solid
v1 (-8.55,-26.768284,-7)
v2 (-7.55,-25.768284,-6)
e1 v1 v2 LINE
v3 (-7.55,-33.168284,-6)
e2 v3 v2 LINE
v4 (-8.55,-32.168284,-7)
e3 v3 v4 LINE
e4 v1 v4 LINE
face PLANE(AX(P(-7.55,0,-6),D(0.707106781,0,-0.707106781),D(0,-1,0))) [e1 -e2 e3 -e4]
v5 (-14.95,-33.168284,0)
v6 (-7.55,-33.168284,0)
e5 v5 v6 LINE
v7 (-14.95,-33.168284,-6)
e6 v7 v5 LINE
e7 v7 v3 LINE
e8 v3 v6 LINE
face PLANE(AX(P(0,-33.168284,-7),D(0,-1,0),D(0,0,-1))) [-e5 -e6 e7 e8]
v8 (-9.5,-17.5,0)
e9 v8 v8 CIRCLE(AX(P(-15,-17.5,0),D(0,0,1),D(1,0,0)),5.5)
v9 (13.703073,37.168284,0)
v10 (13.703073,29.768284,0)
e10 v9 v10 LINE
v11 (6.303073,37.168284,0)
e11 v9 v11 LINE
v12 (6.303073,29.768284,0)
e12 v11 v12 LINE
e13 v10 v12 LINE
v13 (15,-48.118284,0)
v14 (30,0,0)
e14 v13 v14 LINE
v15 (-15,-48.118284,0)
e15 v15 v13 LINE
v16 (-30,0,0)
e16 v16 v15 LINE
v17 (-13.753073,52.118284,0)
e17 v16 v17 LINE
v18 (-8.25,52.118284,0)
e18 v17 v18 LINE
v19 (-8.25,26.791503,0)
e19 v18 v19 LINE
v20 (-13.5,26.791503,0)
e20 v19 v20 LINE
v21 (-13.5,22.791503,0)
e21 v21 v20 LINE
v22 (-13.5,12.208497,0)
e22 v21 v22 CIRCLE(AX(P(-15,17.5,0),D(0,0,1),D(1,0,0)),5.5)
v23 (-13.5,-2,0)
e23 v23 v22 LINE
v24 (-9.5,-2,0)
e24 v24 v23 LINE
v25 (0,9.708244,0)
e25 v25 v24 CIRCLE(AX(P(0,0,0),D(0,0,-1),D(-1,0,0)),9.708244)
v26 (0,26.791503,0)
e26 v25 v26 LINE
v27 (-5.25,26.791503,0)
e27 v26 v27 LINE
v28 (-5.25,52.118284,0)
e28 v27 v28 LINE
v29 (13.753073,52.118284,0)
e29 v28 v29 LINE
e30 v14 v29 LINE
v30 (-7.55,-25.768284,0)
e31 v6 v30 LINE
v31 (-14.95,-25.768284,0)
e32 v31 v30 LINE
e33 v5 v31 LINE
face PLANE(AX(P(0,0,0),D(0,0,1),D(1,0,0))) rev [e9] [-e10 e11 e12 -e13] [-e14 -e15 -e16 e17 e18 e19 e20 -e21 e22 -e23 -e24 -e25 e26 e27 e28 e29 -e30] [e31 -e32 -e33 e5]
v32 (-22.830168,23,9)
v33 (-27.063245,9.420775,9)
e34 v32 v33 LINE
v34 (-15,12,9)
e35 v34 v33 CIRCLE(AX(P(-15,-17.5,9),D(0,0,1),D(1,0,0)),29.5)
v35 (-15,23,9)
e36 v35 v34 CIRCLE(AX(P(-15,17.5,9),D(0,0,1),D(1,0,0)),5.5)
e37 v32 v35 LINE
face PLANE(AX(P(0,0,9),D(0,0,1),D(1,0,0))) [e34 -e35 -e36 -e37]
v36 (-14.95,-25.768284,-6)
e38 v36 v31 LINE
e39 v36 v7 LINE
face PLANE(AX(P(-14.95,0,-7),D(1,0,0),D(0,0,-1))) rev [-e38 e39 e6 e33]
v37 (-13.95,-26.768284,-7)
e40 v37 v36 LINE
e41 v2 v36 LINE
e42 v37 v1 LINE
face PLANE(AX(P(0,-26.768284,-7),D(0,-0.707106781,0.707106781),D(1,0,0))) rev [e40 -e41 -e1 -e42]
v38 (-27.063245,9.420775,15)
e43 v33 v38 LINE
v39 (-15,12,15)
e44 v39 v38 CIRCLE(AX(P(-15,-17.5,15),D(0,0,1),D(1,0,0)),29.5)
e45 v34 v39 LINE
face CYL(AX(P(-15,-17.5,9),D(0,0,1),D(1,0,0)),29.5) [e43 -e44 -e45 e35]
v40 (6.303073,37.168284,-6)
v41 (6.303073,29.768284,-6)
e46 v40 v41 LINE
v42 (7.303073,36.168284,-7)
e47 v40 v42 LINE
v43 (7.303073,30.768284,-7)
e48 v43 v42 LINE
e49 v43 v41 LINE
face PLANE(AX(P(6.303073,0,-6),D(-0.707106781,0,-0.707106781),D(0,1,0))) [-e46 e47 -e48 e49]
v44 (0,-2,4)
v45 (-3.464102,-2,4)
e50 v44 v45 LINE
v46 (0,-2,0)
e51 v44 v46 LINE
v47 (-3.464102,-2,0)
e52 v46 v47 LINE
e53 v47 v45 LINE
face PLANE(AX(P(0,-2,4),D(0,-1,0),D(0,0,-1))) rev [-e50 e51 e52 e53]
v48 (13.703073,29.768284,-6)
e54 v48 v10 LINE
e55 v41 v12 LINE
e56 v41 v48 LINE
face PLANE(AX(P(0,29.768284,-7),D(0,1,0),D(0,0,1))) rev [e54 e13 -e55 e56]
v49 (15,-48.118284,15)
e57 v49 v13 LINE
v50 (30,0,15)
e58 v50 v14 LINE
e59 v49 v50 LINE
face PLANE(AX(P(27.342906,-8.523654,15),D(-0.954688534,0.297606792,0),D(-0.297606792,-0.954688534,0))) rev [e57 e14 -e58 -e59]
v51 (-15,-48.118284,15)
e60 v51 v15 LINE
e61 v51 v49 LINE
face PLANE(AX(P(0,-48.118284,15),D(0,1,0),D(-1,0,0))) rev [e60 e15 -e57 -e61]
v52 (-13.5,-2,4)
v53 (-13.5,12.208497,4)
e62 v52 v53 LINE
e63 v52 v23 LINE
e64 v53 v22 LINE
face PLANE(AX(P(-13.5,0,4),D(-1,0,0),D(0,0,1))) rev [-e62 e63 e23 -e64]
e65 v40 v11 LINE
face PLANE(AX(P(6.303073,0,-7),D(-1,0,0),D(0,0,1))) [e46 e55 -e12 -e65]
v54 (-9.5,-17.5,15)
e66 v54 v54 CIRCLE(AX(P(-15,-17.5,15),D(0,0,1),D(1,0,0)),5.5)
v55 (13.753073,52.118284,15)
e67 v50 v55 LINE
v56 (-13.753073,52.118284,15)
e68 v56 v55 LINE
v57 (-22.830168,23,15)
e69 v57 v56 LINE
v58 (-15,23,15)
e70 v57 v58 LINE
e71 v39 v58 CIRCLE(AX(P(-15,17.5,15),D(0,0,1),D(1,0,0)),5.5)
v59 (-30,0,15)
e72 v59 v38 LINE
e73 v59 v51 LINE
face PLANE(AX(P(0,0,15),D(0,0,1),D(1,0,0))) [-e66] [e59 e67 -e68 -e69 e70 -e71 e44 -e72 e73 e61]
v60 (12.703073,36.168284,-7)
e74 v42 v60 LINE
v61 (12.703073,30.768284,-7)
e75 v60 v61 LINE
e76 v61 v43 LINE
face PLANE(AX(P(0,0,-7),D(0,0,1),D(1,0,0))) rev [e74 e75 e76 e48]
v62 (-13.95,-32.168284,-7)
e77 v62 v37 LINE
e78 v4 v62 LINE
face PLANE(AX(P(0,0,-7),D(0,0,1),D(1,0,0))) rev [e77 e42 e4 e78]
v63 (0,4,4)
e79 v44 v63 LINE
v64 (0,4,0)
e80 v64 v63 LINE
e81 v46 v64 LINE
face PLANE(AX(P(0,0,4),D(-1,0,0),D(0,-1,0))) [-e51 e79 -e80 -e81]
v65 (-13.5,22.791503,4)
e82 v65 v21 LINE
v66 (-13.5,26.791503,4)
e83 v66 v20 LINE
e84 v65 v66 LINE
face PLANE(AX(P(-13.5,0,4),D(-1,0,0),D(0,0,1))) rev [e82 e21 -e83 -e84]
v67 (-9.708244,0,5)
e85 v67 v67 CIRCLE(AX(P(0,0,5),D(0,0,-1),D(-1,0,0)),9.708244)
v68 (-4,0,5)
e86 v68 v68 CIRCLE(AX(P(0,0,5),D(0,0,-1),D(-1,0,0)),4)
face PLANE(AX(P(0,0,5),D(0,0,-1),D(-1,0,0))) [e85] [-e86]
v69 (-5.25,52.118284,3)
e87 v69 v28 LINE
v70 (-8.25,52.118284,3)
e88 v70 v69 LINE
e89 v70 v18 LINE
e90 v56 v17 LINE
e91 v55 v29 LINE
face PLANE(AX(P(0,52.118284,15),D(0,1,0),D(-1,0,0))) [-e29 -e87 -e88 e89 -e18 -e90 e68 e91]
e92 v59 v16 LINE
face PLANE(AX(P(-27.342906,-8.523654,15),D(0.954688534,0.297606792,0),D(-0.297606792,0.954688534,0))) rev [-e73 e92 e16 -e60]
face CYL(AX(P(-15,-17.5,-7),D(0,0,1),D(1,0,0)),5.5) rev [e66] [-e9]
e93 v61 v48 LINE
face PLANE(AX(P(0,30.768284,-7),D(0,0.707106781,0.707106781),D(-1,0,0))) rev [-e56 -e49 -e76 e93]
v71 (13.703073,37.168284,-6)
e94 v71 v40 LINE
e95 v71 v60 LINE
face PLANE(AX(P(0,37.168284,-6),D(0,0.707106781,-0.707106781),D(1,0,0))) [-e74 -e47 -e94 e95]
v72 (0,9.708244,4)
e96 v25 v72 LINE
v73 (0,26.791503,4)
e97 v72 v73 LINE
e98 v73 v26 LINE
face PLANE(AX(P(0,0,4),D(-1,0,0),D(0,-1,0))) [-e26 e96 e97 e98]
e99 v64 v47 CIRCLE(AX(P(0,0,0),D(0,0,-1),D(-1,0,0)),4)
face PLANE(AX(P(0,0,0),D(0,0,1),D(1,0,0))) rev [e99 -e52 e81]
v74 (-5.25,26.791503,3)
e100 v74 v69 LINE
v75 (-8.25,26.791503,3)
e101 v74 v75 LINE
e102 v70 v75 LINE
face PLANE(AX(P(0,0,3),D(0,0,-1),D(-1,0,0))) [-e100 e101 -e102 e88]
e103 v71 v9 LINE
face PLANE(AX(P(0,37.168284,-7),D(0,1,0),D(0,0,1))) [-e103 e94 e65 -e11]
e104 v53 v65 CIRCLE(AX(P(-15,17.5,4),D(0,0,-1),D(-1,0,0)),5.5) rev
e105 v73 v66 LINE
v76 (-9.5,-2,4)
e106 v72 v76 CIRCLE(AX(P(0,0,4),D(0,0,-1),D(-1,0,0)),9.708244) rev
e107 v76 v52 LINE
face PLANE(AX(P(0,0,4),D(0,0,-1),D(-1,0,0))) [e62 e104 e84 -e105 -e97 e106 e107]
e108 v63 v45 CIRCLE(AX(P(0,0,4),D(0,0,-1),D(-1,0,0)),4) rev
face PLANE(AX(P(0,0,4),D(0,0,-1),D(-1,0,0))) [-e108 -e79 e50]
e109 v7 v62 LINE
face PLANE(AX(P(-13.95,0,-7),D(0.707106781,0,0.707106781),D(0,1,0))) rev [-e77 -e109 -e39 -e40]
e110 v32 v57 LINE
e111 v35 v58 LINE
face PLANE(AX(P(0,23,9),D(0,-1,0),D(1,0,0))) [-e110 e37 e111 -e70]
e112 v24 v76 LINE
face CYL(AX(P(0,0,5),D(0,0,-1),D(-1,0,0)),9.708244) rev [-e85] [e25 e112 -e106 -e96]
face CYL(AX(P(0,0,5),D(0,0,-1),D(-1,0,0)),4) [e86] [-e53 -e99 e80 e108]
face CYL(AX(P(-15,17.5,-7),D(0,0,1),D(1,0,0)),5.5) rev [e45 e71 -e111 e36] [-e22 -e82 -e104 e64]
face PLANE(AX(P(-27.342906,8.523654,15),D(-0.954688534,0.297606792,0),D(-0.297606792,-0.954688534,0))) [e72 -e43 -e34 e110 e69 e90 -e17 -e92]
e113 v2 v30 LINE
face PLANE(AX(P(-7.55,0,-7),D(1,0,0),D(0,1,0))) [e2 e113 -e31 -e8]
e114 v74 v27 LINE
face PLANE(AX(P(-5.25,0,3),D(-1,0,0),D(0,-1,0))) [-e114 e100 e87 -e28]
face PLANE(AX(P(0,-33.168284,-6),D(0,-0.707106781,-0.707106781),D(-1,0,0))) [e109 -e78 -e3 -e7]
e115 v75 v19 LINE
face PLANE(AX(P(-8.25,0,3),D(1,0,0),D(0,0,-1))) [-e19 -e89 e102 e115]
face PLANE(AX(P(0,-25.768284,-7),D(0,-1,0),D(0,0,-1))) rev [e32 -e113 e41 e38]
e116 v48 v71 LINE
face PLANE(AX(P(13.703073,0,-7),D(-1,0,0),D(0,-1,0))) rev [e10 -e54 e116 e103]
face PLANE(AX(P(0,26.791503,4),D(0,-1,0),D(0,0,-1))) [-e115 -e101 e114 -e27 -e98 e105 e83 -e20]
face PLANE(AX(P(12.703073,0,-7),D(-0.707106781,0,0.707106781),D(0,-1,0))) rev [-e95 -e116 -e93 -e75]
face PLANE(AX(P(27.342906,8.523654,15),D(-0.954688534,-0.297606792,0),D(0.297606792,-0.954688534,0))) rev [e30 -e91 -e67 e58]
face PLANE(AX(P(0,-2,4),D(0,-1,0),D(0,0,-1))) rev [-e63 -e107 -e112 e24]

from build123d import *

# Parameters (mm, degrees)
BOSS_EXTRUDE1_DEPTH    = 15
SKETCH1_5_W            = 7.4
SKETCH1_5_H            = 7.4
BOSS_EXTRUDE2_DEPTH    = 7
CHAMFER1_SIZE          = 1
SKETCH2_R              = 9.708243919
SKETCH2_R_2            = 4
INNER_DISK_DEPTH       = 5
HOLE_DEPTH             = 65.033705881
HOLE_DEPTH_BACK        = 65.033705881
CUT_EXTRUDE5_DEPTH     = 6
CUT_EXTRUDE3_DEPTH     = 4
CUT_EXTRUDE4_START     = -8.25
CUT_EXTRUDE4_OUTLINE_W = 25.326781011
CUT_EXTRUDE4_OUTLINE_H = 3
CUT_EXTRUDE4_DEPTH     = 3


# Read off the part's stored shape, not the designer's step: Cut-Extrude4
with BuildPart() as part:
    # Sketch1 → Boss-Extrude1 (new body)
    with BuildSketch(Plane.XY):
        Polygon((30, 0), (13.753072731, 52.118283633), (-13.753072731, 52.118283633), (-30, 0), (-15, -48.118283633), (15, -48.118283633), align=None)
    extrude(amount=BOSS_EXTRUDE1_DEPTH)

    # Sketch1<5> → Boss-Extrude2 (add)
    with BuildSketch(Plane.XY):
        with Locations((10.003072731, 33.468283633)):
            Rectangle(SKETCH1_5_W, SKETCH1_5_H)
        with Locations((-11.25, -29.468283633)):
            Rectangle(SKETCH1_5_W, SKETCH1_5_H)
    extrude(amount=-BOSS_EXTRUDE2_DEPTH)

    # Chamfer1
    chamfer1_edges = [part.edges().sort_by_distance(p)[0] for p in [
        (10.003072731, 37.168283633, -7),
        (6.303072731, 33.468283633, -7),
        (13.703072731, 33.468283633, -7),
        (10.003072731, 29.768283633, -7),
        (-11.25, -33.168283633, -7),
        (-7.55, -29.468283633, -7),
        (-14.95, -29.468283633, -7),
        (-11.25, -25.768283633, -7),
    ]]
    chamfer(chamfer1_edges, length=CHAMFER1_SIZE)

    # Sketch2 → Inner Disk (cut)
    with BuildSketch(Plane(origin=(0, 0, 0), x_dir=(-1, 0, 0), z_dir=(0, 0, -1))):
        Circle(SKETCH2_R)
        Circle(SKETCH2_R_2, mode=Mode.SUBTRACT)
    extrude(amount=-INNER_DISK_DEPTH, mode=Mode.SUBTRACT)

    # Sketch3 → Hole (cut, two sides: drawn at the far end of the back side and taken through both)
    with BuildSketch(Plane.XY.offset(15).offset(-HOLE_DEPTH_BACK)):
        with BuildLine():
            ThreePointArc((-15, 23), (-20.5, 17.5), (-15, 12))
            Line((-15, 12), (-15, 17.5))
            Line((-15, 17.5), (-15, 23))
        make_face()
        with BuildLine():
            Line((-15, 17.5), (-15, 12))
            ThreePointArc((-15, 12), (-11.110912703, 13.610912703), (-9.5, 17.5))
            ThreePointArc((-9.5, 17.5), (-11.110912703, 21.389087297), (-15, 23))
            Line((-15, 23), (-15, 17.5))
        make_face()
        with BuildLine():
            ThreePointArc((-9.5, -17.5), (-11.110912703, -13.610912703), (-15, -12))
            Line((-15, -12), (-15, -17.5))
            Line((-15, -17.5), (-15, -23))
            ThreePointArc((-15, -23), (-11.110912703, -21.389087297), (-9.5, -17.5))
        make_face()
        with BuildLine():
            Line((-15, -17.5), (-15, -12))
            ThreePointArc((-15, -12), (-20.5, -17.5), (-15, -23))
            Line((-15, -23), (-15, -17.5))
        make_face()
    extrude(amount=HOLE_DEPTH + HOLE_DEPTH_BACK, mode=Mode.SUBTRACT)

    # Sketch3<3> → Cut-Extrude5 (cut)
    with BuildSketch(Plane.XY.offset(15)):
        with BuildLine():
            ThreePointArc((-27.063244683, 9.420775021), (-21.167946858, 11.347988345), (-15, 12))
            ThreePointArc((-15, 12), (-20.5, 17.5), (-15, 23))
            Line((-15, 23), (-22.830168203, 23))
            Line((-22.830168203, 23), (-27.063244683, 9.420775021))
        make_face()
    extrude(amount=-CUT_EXTRUDE5_DEPTH, mode=Mode.SUBTRACT)

    # Sketch4 → Cut-Extrude3 (cut)
    with BuildSketch(Plane(origin=(0, 0, 0), x_dir=(-1, 0, 0), z_dir=(0, 0, -1))):
        with BuildLine():
            Line((0, 9.708243919), (0, -2))
            Line((0, -2), (9.5, -2))
            ThreePointArc((9.5, -2), (9.656042596, -1.005406078), (9.708243919, 0))
            ThreePointArc((9.708243919, 0), (6.864765109, 6.864765109), (0, 9.708243919))
        make_face()
        with BuildLine():
            ThreePointArc((9.708243919, 0), (9.656042596, -1.005406078), (9.5, -2))
            Line((9.5, -2), (13.5, -2))
            Line((13.5, -2), (13.5, 12.208497378))
            ThreePointArc((13.5, 12.208497378), (9.5, 17.5), (13.5, 22.791502622))
            Line((13.5, 22.791502622), (13.5, 26.791502622))
            Line((13.5, 26.791502622), (8.25, 26.791502622))
            Line((8.25, 26.791502622), (5.25, 26.791502622))
            Line((5.25, 26.791502622), (0, 26.791502622))
            Line((0, 26.791502622), (0, 17.5))
            Line((0, 17.5), (0, 9.708243919))
            ThreePointArc((0, 9.708243919), (6.864765109, 6.864765109), (9.708243919, 0))
        make_face()
    extrude(amount=-CUT_EXTRUDE3_DEPTH, mode=Mode.SUBTRACT)

    # Cut-Extrude4 outline → Cut-Extrude4 (cut)
    with BuildSketch(Plane.YZ.offset(CUT_EXTRUDE4_START)):
        with Locations((39.454893128, 1.5)):
            Rectangle(CUT_EXTRUDE4_OUTLINE_W, CUT_EXTRUDE4_OUTLINE_H)
    extrude(amount=CUT_EXTRUDE4_DEPTH, mode=Mode.SUBTRACT)


solid = part.part
